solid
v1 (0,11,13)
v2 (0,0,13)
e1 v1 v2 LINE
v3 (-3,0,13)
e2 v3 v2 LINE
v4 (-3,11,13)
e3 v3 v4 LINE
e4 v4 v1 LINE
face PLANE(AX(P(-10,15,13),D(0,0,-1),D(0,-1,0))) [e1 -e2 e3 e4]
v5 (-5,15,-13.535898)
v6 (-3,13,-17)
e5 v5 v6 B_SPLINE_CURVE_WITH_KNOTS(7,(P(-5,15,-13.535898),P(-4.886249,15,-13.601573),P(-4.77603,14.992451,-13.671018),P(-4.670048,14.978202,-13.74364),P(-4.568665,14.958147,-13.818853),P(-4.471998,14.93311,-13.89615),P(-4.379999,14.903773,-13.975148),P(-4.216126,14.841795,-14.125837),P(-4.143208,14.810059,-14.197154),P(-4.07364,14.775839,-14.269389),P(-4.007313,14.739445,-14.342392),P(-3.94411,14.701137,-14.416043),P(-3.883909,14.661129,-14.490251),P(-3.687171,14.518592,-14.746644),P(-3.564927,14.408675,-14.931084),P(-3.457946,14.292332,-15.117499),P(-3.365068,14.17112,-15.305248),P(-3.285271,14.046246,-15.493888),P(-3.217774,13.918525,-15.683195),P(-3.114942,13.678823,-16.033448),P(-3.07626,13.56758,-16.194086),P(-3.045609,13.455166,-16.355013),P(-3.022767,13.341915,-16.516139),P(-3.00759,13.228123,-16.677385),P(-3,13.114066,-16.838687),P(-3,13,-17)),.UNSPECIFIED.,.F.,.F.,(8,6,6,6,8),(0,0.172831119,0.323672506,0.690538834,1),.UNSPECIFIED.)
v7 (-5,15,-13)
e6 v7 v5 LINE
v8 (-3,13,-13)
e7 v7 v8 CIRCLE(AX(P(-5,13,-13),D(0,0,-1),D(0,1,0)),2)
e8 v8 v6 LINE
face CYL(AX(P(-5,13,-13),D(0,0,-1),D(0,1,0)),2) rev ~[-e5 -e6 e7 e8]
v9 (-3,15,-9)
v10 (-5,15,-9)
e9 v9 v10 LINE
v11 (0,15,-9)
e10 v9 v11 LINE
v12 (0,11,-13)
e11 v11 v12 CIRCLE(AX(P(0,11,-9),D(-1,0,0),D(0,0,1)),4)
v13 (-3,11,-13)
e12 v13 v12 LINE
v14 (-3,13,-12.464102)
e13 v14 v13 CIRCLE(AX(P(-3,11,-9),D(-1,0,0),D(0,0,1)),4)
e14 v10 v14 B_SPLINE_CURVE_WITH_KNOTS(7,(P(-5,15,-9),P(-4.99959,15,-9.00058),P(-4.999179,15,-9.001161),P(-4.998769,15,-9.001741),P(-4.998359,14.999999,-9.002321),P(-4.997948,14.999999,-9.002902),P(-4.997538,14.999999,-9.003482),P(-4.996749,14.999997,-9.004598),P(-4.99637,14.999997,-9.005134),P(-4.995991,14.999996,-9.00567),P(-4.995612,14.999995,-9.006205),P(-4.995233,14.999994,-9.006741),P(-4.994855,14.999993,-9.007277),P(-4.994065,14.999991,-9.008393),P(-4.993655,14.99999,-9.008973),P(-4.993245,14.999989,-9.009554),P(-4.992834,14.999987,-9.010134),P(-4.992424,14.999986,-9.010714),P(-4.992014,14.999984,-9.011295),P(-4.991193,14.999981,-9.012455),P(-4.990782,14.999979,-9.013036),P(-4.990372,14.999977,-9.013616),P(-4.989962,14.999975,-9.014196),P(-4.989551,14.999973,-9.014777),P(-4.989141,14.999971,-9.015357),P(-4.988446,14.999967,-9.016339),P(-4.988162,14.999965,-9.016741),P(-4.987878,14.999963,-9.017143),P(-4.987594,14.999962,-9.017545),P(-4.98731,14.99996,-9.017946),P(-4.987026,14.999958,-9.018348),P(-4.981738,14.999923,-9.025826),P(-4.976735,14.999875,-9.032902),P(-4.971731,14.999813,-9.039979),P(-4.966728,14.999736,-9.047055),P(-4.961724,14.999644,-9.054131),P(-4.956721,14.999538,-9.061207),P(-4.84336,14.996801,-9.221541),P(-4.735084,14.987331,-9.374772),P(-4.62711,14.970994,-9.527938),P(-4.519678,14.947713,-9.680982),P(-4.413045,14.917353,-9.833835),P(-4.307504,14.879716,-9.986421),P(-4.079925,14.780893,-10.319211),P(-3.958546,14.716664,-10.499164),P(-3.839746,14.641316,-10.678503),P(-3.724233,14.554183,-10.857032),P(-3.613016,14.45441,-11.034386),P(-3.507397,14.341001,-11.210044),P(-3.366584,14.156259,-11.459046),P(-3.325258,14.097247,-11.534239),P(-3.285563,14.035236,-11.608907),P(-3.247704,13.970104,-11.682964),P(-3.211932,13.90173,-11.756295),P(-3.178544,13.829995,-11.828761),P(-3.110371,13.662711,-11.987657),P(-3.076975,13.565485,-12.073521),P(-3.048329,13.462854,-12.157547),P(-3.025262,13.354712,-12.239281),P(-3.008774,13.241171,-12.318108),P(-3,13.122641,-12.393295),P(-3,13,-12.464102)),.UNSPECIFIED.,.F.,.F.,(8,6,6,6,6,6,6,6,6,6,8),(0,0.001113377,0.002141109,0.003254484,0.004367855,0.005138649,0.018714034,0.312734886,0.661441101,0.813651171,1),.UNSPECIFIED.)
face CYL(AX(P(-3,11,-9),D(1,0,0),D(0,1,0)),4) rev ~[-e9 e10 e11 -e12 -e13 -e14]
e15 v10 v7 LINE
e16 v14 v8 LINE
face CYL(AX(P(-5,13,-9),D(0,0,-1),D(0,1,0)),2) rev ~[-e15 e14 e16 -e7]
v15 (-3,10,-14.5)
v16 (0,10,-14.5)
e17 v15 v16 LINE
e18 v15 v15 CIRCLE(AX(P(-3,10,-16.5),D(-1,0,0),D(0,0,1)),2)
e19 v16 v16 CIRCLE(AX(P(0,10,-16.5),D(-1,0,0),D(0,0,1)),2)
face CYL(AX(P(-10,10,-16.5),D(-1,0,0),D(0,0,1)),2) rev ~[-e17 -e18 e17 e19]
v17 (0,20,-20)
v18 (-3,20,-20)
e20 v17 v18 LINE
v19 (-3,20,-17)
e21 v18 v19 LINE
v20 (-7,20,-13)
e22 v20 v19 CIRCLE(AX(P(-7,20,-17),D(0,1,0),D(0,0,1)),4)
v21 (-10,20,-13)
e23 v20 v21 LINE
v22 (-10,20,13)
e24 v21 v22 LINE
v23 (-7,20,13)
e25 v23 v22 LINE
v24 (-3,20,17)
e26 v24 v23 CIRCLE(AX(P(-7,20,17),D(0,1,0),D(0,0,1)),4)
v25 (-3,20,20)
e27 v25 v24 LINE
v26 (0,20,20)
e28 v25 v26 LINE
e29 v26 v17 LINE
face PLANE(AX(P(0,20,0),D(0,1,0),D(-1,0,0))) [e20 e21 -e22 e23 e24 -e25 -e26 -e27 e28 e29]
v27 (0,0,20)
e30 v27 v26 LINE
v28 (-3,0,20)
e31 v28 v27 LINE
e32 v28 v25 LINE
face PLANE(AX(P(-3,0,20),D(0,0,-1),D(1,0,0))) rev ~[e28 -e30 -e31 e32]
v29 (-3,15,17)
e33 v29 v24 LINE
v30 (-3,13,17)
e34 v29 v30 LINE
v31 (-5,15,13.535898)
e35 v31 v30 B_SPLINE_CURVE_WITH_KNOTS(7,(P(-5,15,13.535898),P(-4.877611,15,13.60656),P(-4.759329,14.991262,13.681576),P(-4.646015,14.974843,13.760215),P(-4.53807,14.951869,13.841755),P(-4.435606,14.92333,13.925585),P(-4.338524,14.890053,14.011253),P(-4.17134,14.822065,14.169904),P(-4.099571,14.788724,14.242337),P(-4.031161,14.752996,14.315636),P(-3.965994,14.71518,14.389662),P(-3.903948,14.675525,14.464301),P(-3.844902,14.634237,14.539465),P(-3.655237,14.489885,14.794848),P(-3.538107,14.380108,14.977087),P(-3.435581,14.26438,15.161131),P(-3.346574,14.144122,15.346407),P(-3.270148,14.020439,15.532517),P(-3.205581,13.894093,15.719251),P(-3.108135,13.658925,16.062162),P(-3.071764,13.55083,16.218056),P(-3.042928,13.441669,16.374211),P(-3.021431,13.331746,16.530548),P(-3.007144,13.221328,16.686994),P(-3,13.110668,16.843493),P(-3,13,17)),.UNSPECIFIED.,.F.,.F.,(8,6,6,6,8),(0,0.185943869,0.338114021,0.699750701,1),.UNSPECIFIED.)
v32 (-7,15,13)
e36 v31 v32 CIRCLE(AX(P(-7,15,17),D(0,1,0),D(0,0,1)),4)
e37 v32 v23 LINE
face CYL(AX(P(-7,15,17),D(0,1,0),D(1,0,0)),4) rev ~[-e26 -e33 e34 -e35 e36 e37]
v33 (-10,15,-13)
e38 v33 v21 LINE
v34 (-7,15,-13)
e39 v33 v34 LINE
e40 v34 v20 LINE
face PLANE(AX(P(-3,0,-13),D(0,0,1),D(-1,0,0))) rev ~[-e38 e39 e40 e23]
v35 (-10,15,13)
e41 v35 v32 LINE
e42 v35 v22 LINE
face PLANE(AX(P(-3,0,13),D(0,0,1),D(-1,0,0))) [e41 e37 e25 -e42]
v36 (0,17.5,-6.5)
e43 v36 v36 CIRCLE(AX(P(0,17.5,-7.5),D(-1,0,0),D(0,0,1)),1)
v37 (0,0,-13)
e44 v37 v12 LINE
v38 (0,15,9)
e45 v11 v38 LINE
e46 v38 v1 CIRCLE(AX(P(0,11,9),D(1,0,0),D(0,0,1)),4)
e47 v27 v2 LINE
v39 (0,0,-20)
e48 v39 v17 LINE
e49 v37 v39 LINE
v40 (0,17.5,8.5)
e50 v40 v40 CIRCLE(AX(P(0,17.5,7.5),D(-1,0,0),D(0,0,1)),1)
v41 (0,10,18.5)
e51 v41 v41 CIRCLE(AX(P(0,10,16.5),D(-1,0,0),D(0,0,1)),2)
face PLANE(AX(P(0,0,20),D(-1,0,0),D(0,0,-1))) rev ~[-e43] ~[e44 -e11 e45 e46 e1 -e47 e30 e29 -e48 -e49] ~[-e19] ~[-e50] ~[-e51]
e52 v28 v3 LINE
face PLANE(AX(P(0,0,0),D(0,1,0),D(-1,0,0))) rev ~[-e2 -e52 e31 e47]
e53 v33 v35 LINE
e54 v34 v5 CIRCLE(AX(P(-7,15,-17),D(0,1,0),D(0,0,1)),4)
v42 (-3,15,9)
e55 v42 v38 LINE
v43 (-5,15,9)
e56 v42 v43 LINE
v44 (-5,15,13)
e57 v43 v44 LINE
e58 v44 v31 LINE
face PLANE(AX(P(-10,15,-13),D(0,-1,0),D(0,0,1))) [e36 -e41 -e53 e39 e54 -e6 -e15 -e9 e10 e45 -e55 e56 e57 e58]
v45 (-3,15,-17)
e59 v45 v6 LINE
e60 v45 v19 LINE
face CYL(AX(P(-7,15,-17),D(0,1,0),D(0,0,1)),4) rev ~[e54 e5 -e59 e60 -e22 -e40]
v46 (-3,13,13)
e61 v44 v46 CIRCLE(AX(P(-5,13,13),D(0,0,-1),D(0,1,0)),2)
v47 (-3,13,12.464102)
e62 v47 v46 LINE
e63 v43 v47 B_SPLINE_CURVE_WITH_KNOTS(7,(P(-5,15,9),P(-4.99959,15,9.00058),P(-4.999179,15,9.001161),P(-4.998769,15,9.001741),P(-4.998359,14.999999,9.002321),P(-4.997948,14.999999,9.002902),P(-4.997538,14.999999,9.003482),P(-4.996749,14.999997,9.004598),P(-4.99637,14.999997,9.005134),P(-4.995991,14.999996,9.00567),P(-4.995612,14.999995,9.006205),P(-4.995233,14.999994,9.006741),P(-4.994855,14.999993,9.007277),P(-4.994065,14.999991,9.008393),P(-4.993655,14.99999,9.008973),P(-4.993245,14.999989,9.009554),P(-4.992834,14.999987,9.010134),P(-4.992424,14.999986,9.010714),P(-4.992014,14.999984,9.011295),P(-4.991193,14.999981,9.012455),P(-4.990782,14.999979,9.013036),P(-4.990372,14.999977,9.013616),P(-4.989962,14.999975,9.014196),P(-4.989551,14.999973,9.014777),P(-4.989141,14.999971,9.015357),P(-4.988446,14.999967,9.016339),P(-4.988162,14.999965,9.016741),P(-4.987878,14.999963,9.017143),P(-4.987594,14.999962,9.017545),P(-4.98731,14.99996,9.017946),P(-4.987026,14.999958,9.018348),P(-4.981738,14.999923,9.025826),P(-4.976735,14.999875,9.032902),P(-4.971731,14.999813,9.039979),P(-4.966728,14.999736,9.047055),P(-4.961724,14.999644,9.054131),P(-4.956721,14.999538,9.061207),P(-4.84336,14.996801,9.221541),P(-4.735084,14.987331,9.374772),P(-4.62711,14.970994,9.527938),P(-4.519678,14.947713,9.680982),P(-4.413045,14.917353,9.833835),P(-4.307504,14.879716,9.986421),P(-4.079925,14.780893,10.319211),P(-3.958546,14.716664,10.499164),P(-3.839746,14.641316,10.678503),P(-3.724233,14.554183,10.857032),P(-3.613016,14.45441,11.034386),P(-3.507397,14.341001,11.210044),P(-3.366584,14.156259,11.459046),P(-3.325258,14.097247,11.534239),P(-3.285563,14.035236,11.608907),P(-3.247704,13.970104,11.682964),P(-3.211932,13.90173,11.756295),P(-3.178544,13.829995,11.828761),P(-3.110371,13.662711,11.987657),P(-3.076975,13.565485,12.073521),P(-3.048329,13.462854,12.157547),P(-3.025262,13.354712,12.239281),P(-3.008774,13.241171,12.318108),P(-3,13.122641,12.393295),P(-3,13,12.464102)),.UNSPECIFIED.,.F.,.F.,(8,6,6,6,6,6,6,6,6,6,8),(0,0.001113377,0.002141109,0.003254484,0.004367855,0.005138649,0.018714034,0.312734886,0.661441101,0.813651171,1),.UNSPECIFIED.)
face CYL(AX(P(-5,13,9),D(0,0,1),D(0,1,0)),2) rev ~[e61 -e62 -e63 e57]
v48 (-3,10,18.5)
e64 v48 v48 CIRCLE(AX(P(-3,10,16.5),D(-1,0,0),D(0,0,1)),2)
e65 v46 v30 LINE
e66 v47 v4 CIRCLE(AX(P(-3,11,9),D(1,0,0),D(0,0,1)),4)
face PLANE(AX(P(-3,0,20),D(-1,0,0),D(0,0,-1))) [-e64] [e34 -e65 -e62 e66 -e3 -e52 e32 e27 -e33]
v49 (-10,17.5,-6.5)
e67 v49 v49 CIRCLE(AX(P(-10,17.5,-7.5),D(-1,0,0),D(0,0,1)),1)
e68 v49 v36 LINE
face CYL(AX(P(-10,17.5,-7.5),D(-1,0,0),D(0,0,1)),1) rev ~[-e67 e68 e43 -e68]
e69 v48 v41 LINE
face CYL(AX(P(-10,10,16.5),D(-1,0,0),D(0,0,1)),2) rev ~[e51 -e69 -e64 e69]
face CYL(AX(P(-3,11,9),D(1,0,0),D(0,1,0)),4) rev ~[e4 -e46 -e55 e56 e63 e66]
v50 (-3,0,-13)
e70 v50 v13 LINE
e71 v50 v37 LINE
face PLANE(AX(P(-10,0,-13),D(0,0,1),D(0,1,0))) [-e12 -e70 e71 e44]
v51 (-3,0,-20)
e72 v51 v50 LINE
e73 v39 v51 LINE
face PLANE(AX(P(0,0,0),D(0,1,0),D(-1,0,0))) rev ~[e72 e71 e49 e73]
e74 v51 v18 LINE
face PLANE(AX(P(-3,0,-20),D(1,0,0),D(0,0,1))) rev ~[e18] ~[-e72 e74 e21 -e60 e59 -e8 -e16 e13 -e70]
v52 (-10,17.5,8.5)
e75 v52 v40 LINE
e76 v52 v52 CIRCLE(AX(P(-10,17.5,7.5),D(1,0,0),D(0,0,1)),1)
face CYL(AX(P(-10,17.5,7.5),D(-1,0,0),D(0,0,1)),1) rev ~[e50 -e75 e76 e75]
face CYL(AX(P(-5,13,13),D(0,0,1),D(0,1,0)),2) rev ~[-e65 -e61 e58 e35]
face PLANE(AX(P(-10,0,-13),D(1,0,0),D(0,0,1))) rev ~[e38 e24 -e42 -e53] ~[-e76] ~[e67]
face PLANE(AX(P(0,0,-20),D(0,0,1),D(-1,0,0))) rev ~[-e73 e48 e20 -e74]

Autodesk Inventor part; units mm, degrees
ref_plane "YZ Plane" through (0, 0, 0) normal (1, 0, 0) x (0, 1, 0)
ref_plane "XZ Plane" through (0, 0, 0) normal (0, 1, 0) x (-1, 0, 0)
ref_plane "XY Plane" through (0, 0, 0) normal (0, 0, 1) x (1, 0, 0)
sketch "Sketch1" plane through (0, 0, 0) normal (0, 1, 0) x (-1, 0, 0)
  line L0 (10, 20) -> (0, 20)
  line L1 (0, 20) -> (0, -20)
  line L2 (0, -20) -> (10, -20)
  line L3 (10, -20) -> (10, 20)
  line L4 (10, 20) -> (3, 20)
  line L5 (3, 20) -> (3, 13)
  line L6 (3, 13) -> (10, 13)
  line L7 (10, 13) -> (10, 20)
  line L8 (10, -20) -> (3, -20)
  line L9 (3, -20) -> (3, -13)
  line L10 (3, -13) -> (10, -13)
  line L11 (10, -13) -> (10, -20)
  point P0 (0, 0)
  point P1 (0, 0)
  dimension "d0" = 10
  dimension "d1" = 40
  dimension "d2" = 7
  dimension "d3" = 7
  dimension "d4" = 7
  dimension "d5" = 7
extrude "Extrusion1" add sketch "Sketch1" along normal blind 20 contours L5 L6 L3 L10 L9 L2 L1 L0
sketch "Sketch2" plane through (-10, 0, -13) normal (-1, 0, 0) x (0, 0, 1)
  line L0 (0, 0) -> (26, 0) projected
  line L1 (0, 0) -> (0, 20) projected
  line L2 (26, 0) -> (0, 0)
  line L3 (0, 0) -> (0, 15)
  line L4 (0, 15) -> (26, 15)
  line L5 (26, 15) -> (26, 0)
  circle A0 centre (29.5, 10) radius 2
  circle A1 centre (-3.5, 10) radius 2
  line L6 (-7, 0) -> (-7, 20) projected
  line L7 (26, 0) -> (33, 0) projected
  line L8 (-7, 0) -> (0, 0) projected
  point P0 (13, 0)
  point P1 (-7, 10)
  point P2 (29.5, 0)
  point P3 (-3.5, 0)
  dimension "d8" = 15
  dimension "d9" = 4
  dimension "d10" = 4
extrude "Extrusion2" cut sketch "Sketch2" against normal through all
sketch "Sketch3" plane through (-10, 20, -13) normal (-1, 0, 0) x (0, 0, 1)
  circle A0 centre (20.5, -2.5) radius 1
  circle A1 centre (5.5, -2.5) radius 1
  line L0 (0, -5) -> (0, 0) projected
  line L1 (20.5, -2.5) -> (5.5, -2.5)
  line L2 (0, -5) -> (26, -5) projected
  point P0 (13, -20)
  point P1 (0, -2.5)
  point P2 (13, -2.5)
  point P3 (13, -5)
  dimension "d13" = 2
  dimension "d14" = 2
  dimension "d15" = 15
extrude "Extrusion3" cut sketch "Sketch3" against normal through all
fillet "Fillet1" radius 4 4 edges at (-3, 17.5, -13) (-3, 17.5, 13) (-1.5, 15, -13) (-1.5, 15, 13)
fillet "Fillet2" radius 2 4 edges at (-3, 15, 15) (-3, 15, 11) (-3, 15, -15) (-3, 15, -11)
properties part number "mpu6050"
